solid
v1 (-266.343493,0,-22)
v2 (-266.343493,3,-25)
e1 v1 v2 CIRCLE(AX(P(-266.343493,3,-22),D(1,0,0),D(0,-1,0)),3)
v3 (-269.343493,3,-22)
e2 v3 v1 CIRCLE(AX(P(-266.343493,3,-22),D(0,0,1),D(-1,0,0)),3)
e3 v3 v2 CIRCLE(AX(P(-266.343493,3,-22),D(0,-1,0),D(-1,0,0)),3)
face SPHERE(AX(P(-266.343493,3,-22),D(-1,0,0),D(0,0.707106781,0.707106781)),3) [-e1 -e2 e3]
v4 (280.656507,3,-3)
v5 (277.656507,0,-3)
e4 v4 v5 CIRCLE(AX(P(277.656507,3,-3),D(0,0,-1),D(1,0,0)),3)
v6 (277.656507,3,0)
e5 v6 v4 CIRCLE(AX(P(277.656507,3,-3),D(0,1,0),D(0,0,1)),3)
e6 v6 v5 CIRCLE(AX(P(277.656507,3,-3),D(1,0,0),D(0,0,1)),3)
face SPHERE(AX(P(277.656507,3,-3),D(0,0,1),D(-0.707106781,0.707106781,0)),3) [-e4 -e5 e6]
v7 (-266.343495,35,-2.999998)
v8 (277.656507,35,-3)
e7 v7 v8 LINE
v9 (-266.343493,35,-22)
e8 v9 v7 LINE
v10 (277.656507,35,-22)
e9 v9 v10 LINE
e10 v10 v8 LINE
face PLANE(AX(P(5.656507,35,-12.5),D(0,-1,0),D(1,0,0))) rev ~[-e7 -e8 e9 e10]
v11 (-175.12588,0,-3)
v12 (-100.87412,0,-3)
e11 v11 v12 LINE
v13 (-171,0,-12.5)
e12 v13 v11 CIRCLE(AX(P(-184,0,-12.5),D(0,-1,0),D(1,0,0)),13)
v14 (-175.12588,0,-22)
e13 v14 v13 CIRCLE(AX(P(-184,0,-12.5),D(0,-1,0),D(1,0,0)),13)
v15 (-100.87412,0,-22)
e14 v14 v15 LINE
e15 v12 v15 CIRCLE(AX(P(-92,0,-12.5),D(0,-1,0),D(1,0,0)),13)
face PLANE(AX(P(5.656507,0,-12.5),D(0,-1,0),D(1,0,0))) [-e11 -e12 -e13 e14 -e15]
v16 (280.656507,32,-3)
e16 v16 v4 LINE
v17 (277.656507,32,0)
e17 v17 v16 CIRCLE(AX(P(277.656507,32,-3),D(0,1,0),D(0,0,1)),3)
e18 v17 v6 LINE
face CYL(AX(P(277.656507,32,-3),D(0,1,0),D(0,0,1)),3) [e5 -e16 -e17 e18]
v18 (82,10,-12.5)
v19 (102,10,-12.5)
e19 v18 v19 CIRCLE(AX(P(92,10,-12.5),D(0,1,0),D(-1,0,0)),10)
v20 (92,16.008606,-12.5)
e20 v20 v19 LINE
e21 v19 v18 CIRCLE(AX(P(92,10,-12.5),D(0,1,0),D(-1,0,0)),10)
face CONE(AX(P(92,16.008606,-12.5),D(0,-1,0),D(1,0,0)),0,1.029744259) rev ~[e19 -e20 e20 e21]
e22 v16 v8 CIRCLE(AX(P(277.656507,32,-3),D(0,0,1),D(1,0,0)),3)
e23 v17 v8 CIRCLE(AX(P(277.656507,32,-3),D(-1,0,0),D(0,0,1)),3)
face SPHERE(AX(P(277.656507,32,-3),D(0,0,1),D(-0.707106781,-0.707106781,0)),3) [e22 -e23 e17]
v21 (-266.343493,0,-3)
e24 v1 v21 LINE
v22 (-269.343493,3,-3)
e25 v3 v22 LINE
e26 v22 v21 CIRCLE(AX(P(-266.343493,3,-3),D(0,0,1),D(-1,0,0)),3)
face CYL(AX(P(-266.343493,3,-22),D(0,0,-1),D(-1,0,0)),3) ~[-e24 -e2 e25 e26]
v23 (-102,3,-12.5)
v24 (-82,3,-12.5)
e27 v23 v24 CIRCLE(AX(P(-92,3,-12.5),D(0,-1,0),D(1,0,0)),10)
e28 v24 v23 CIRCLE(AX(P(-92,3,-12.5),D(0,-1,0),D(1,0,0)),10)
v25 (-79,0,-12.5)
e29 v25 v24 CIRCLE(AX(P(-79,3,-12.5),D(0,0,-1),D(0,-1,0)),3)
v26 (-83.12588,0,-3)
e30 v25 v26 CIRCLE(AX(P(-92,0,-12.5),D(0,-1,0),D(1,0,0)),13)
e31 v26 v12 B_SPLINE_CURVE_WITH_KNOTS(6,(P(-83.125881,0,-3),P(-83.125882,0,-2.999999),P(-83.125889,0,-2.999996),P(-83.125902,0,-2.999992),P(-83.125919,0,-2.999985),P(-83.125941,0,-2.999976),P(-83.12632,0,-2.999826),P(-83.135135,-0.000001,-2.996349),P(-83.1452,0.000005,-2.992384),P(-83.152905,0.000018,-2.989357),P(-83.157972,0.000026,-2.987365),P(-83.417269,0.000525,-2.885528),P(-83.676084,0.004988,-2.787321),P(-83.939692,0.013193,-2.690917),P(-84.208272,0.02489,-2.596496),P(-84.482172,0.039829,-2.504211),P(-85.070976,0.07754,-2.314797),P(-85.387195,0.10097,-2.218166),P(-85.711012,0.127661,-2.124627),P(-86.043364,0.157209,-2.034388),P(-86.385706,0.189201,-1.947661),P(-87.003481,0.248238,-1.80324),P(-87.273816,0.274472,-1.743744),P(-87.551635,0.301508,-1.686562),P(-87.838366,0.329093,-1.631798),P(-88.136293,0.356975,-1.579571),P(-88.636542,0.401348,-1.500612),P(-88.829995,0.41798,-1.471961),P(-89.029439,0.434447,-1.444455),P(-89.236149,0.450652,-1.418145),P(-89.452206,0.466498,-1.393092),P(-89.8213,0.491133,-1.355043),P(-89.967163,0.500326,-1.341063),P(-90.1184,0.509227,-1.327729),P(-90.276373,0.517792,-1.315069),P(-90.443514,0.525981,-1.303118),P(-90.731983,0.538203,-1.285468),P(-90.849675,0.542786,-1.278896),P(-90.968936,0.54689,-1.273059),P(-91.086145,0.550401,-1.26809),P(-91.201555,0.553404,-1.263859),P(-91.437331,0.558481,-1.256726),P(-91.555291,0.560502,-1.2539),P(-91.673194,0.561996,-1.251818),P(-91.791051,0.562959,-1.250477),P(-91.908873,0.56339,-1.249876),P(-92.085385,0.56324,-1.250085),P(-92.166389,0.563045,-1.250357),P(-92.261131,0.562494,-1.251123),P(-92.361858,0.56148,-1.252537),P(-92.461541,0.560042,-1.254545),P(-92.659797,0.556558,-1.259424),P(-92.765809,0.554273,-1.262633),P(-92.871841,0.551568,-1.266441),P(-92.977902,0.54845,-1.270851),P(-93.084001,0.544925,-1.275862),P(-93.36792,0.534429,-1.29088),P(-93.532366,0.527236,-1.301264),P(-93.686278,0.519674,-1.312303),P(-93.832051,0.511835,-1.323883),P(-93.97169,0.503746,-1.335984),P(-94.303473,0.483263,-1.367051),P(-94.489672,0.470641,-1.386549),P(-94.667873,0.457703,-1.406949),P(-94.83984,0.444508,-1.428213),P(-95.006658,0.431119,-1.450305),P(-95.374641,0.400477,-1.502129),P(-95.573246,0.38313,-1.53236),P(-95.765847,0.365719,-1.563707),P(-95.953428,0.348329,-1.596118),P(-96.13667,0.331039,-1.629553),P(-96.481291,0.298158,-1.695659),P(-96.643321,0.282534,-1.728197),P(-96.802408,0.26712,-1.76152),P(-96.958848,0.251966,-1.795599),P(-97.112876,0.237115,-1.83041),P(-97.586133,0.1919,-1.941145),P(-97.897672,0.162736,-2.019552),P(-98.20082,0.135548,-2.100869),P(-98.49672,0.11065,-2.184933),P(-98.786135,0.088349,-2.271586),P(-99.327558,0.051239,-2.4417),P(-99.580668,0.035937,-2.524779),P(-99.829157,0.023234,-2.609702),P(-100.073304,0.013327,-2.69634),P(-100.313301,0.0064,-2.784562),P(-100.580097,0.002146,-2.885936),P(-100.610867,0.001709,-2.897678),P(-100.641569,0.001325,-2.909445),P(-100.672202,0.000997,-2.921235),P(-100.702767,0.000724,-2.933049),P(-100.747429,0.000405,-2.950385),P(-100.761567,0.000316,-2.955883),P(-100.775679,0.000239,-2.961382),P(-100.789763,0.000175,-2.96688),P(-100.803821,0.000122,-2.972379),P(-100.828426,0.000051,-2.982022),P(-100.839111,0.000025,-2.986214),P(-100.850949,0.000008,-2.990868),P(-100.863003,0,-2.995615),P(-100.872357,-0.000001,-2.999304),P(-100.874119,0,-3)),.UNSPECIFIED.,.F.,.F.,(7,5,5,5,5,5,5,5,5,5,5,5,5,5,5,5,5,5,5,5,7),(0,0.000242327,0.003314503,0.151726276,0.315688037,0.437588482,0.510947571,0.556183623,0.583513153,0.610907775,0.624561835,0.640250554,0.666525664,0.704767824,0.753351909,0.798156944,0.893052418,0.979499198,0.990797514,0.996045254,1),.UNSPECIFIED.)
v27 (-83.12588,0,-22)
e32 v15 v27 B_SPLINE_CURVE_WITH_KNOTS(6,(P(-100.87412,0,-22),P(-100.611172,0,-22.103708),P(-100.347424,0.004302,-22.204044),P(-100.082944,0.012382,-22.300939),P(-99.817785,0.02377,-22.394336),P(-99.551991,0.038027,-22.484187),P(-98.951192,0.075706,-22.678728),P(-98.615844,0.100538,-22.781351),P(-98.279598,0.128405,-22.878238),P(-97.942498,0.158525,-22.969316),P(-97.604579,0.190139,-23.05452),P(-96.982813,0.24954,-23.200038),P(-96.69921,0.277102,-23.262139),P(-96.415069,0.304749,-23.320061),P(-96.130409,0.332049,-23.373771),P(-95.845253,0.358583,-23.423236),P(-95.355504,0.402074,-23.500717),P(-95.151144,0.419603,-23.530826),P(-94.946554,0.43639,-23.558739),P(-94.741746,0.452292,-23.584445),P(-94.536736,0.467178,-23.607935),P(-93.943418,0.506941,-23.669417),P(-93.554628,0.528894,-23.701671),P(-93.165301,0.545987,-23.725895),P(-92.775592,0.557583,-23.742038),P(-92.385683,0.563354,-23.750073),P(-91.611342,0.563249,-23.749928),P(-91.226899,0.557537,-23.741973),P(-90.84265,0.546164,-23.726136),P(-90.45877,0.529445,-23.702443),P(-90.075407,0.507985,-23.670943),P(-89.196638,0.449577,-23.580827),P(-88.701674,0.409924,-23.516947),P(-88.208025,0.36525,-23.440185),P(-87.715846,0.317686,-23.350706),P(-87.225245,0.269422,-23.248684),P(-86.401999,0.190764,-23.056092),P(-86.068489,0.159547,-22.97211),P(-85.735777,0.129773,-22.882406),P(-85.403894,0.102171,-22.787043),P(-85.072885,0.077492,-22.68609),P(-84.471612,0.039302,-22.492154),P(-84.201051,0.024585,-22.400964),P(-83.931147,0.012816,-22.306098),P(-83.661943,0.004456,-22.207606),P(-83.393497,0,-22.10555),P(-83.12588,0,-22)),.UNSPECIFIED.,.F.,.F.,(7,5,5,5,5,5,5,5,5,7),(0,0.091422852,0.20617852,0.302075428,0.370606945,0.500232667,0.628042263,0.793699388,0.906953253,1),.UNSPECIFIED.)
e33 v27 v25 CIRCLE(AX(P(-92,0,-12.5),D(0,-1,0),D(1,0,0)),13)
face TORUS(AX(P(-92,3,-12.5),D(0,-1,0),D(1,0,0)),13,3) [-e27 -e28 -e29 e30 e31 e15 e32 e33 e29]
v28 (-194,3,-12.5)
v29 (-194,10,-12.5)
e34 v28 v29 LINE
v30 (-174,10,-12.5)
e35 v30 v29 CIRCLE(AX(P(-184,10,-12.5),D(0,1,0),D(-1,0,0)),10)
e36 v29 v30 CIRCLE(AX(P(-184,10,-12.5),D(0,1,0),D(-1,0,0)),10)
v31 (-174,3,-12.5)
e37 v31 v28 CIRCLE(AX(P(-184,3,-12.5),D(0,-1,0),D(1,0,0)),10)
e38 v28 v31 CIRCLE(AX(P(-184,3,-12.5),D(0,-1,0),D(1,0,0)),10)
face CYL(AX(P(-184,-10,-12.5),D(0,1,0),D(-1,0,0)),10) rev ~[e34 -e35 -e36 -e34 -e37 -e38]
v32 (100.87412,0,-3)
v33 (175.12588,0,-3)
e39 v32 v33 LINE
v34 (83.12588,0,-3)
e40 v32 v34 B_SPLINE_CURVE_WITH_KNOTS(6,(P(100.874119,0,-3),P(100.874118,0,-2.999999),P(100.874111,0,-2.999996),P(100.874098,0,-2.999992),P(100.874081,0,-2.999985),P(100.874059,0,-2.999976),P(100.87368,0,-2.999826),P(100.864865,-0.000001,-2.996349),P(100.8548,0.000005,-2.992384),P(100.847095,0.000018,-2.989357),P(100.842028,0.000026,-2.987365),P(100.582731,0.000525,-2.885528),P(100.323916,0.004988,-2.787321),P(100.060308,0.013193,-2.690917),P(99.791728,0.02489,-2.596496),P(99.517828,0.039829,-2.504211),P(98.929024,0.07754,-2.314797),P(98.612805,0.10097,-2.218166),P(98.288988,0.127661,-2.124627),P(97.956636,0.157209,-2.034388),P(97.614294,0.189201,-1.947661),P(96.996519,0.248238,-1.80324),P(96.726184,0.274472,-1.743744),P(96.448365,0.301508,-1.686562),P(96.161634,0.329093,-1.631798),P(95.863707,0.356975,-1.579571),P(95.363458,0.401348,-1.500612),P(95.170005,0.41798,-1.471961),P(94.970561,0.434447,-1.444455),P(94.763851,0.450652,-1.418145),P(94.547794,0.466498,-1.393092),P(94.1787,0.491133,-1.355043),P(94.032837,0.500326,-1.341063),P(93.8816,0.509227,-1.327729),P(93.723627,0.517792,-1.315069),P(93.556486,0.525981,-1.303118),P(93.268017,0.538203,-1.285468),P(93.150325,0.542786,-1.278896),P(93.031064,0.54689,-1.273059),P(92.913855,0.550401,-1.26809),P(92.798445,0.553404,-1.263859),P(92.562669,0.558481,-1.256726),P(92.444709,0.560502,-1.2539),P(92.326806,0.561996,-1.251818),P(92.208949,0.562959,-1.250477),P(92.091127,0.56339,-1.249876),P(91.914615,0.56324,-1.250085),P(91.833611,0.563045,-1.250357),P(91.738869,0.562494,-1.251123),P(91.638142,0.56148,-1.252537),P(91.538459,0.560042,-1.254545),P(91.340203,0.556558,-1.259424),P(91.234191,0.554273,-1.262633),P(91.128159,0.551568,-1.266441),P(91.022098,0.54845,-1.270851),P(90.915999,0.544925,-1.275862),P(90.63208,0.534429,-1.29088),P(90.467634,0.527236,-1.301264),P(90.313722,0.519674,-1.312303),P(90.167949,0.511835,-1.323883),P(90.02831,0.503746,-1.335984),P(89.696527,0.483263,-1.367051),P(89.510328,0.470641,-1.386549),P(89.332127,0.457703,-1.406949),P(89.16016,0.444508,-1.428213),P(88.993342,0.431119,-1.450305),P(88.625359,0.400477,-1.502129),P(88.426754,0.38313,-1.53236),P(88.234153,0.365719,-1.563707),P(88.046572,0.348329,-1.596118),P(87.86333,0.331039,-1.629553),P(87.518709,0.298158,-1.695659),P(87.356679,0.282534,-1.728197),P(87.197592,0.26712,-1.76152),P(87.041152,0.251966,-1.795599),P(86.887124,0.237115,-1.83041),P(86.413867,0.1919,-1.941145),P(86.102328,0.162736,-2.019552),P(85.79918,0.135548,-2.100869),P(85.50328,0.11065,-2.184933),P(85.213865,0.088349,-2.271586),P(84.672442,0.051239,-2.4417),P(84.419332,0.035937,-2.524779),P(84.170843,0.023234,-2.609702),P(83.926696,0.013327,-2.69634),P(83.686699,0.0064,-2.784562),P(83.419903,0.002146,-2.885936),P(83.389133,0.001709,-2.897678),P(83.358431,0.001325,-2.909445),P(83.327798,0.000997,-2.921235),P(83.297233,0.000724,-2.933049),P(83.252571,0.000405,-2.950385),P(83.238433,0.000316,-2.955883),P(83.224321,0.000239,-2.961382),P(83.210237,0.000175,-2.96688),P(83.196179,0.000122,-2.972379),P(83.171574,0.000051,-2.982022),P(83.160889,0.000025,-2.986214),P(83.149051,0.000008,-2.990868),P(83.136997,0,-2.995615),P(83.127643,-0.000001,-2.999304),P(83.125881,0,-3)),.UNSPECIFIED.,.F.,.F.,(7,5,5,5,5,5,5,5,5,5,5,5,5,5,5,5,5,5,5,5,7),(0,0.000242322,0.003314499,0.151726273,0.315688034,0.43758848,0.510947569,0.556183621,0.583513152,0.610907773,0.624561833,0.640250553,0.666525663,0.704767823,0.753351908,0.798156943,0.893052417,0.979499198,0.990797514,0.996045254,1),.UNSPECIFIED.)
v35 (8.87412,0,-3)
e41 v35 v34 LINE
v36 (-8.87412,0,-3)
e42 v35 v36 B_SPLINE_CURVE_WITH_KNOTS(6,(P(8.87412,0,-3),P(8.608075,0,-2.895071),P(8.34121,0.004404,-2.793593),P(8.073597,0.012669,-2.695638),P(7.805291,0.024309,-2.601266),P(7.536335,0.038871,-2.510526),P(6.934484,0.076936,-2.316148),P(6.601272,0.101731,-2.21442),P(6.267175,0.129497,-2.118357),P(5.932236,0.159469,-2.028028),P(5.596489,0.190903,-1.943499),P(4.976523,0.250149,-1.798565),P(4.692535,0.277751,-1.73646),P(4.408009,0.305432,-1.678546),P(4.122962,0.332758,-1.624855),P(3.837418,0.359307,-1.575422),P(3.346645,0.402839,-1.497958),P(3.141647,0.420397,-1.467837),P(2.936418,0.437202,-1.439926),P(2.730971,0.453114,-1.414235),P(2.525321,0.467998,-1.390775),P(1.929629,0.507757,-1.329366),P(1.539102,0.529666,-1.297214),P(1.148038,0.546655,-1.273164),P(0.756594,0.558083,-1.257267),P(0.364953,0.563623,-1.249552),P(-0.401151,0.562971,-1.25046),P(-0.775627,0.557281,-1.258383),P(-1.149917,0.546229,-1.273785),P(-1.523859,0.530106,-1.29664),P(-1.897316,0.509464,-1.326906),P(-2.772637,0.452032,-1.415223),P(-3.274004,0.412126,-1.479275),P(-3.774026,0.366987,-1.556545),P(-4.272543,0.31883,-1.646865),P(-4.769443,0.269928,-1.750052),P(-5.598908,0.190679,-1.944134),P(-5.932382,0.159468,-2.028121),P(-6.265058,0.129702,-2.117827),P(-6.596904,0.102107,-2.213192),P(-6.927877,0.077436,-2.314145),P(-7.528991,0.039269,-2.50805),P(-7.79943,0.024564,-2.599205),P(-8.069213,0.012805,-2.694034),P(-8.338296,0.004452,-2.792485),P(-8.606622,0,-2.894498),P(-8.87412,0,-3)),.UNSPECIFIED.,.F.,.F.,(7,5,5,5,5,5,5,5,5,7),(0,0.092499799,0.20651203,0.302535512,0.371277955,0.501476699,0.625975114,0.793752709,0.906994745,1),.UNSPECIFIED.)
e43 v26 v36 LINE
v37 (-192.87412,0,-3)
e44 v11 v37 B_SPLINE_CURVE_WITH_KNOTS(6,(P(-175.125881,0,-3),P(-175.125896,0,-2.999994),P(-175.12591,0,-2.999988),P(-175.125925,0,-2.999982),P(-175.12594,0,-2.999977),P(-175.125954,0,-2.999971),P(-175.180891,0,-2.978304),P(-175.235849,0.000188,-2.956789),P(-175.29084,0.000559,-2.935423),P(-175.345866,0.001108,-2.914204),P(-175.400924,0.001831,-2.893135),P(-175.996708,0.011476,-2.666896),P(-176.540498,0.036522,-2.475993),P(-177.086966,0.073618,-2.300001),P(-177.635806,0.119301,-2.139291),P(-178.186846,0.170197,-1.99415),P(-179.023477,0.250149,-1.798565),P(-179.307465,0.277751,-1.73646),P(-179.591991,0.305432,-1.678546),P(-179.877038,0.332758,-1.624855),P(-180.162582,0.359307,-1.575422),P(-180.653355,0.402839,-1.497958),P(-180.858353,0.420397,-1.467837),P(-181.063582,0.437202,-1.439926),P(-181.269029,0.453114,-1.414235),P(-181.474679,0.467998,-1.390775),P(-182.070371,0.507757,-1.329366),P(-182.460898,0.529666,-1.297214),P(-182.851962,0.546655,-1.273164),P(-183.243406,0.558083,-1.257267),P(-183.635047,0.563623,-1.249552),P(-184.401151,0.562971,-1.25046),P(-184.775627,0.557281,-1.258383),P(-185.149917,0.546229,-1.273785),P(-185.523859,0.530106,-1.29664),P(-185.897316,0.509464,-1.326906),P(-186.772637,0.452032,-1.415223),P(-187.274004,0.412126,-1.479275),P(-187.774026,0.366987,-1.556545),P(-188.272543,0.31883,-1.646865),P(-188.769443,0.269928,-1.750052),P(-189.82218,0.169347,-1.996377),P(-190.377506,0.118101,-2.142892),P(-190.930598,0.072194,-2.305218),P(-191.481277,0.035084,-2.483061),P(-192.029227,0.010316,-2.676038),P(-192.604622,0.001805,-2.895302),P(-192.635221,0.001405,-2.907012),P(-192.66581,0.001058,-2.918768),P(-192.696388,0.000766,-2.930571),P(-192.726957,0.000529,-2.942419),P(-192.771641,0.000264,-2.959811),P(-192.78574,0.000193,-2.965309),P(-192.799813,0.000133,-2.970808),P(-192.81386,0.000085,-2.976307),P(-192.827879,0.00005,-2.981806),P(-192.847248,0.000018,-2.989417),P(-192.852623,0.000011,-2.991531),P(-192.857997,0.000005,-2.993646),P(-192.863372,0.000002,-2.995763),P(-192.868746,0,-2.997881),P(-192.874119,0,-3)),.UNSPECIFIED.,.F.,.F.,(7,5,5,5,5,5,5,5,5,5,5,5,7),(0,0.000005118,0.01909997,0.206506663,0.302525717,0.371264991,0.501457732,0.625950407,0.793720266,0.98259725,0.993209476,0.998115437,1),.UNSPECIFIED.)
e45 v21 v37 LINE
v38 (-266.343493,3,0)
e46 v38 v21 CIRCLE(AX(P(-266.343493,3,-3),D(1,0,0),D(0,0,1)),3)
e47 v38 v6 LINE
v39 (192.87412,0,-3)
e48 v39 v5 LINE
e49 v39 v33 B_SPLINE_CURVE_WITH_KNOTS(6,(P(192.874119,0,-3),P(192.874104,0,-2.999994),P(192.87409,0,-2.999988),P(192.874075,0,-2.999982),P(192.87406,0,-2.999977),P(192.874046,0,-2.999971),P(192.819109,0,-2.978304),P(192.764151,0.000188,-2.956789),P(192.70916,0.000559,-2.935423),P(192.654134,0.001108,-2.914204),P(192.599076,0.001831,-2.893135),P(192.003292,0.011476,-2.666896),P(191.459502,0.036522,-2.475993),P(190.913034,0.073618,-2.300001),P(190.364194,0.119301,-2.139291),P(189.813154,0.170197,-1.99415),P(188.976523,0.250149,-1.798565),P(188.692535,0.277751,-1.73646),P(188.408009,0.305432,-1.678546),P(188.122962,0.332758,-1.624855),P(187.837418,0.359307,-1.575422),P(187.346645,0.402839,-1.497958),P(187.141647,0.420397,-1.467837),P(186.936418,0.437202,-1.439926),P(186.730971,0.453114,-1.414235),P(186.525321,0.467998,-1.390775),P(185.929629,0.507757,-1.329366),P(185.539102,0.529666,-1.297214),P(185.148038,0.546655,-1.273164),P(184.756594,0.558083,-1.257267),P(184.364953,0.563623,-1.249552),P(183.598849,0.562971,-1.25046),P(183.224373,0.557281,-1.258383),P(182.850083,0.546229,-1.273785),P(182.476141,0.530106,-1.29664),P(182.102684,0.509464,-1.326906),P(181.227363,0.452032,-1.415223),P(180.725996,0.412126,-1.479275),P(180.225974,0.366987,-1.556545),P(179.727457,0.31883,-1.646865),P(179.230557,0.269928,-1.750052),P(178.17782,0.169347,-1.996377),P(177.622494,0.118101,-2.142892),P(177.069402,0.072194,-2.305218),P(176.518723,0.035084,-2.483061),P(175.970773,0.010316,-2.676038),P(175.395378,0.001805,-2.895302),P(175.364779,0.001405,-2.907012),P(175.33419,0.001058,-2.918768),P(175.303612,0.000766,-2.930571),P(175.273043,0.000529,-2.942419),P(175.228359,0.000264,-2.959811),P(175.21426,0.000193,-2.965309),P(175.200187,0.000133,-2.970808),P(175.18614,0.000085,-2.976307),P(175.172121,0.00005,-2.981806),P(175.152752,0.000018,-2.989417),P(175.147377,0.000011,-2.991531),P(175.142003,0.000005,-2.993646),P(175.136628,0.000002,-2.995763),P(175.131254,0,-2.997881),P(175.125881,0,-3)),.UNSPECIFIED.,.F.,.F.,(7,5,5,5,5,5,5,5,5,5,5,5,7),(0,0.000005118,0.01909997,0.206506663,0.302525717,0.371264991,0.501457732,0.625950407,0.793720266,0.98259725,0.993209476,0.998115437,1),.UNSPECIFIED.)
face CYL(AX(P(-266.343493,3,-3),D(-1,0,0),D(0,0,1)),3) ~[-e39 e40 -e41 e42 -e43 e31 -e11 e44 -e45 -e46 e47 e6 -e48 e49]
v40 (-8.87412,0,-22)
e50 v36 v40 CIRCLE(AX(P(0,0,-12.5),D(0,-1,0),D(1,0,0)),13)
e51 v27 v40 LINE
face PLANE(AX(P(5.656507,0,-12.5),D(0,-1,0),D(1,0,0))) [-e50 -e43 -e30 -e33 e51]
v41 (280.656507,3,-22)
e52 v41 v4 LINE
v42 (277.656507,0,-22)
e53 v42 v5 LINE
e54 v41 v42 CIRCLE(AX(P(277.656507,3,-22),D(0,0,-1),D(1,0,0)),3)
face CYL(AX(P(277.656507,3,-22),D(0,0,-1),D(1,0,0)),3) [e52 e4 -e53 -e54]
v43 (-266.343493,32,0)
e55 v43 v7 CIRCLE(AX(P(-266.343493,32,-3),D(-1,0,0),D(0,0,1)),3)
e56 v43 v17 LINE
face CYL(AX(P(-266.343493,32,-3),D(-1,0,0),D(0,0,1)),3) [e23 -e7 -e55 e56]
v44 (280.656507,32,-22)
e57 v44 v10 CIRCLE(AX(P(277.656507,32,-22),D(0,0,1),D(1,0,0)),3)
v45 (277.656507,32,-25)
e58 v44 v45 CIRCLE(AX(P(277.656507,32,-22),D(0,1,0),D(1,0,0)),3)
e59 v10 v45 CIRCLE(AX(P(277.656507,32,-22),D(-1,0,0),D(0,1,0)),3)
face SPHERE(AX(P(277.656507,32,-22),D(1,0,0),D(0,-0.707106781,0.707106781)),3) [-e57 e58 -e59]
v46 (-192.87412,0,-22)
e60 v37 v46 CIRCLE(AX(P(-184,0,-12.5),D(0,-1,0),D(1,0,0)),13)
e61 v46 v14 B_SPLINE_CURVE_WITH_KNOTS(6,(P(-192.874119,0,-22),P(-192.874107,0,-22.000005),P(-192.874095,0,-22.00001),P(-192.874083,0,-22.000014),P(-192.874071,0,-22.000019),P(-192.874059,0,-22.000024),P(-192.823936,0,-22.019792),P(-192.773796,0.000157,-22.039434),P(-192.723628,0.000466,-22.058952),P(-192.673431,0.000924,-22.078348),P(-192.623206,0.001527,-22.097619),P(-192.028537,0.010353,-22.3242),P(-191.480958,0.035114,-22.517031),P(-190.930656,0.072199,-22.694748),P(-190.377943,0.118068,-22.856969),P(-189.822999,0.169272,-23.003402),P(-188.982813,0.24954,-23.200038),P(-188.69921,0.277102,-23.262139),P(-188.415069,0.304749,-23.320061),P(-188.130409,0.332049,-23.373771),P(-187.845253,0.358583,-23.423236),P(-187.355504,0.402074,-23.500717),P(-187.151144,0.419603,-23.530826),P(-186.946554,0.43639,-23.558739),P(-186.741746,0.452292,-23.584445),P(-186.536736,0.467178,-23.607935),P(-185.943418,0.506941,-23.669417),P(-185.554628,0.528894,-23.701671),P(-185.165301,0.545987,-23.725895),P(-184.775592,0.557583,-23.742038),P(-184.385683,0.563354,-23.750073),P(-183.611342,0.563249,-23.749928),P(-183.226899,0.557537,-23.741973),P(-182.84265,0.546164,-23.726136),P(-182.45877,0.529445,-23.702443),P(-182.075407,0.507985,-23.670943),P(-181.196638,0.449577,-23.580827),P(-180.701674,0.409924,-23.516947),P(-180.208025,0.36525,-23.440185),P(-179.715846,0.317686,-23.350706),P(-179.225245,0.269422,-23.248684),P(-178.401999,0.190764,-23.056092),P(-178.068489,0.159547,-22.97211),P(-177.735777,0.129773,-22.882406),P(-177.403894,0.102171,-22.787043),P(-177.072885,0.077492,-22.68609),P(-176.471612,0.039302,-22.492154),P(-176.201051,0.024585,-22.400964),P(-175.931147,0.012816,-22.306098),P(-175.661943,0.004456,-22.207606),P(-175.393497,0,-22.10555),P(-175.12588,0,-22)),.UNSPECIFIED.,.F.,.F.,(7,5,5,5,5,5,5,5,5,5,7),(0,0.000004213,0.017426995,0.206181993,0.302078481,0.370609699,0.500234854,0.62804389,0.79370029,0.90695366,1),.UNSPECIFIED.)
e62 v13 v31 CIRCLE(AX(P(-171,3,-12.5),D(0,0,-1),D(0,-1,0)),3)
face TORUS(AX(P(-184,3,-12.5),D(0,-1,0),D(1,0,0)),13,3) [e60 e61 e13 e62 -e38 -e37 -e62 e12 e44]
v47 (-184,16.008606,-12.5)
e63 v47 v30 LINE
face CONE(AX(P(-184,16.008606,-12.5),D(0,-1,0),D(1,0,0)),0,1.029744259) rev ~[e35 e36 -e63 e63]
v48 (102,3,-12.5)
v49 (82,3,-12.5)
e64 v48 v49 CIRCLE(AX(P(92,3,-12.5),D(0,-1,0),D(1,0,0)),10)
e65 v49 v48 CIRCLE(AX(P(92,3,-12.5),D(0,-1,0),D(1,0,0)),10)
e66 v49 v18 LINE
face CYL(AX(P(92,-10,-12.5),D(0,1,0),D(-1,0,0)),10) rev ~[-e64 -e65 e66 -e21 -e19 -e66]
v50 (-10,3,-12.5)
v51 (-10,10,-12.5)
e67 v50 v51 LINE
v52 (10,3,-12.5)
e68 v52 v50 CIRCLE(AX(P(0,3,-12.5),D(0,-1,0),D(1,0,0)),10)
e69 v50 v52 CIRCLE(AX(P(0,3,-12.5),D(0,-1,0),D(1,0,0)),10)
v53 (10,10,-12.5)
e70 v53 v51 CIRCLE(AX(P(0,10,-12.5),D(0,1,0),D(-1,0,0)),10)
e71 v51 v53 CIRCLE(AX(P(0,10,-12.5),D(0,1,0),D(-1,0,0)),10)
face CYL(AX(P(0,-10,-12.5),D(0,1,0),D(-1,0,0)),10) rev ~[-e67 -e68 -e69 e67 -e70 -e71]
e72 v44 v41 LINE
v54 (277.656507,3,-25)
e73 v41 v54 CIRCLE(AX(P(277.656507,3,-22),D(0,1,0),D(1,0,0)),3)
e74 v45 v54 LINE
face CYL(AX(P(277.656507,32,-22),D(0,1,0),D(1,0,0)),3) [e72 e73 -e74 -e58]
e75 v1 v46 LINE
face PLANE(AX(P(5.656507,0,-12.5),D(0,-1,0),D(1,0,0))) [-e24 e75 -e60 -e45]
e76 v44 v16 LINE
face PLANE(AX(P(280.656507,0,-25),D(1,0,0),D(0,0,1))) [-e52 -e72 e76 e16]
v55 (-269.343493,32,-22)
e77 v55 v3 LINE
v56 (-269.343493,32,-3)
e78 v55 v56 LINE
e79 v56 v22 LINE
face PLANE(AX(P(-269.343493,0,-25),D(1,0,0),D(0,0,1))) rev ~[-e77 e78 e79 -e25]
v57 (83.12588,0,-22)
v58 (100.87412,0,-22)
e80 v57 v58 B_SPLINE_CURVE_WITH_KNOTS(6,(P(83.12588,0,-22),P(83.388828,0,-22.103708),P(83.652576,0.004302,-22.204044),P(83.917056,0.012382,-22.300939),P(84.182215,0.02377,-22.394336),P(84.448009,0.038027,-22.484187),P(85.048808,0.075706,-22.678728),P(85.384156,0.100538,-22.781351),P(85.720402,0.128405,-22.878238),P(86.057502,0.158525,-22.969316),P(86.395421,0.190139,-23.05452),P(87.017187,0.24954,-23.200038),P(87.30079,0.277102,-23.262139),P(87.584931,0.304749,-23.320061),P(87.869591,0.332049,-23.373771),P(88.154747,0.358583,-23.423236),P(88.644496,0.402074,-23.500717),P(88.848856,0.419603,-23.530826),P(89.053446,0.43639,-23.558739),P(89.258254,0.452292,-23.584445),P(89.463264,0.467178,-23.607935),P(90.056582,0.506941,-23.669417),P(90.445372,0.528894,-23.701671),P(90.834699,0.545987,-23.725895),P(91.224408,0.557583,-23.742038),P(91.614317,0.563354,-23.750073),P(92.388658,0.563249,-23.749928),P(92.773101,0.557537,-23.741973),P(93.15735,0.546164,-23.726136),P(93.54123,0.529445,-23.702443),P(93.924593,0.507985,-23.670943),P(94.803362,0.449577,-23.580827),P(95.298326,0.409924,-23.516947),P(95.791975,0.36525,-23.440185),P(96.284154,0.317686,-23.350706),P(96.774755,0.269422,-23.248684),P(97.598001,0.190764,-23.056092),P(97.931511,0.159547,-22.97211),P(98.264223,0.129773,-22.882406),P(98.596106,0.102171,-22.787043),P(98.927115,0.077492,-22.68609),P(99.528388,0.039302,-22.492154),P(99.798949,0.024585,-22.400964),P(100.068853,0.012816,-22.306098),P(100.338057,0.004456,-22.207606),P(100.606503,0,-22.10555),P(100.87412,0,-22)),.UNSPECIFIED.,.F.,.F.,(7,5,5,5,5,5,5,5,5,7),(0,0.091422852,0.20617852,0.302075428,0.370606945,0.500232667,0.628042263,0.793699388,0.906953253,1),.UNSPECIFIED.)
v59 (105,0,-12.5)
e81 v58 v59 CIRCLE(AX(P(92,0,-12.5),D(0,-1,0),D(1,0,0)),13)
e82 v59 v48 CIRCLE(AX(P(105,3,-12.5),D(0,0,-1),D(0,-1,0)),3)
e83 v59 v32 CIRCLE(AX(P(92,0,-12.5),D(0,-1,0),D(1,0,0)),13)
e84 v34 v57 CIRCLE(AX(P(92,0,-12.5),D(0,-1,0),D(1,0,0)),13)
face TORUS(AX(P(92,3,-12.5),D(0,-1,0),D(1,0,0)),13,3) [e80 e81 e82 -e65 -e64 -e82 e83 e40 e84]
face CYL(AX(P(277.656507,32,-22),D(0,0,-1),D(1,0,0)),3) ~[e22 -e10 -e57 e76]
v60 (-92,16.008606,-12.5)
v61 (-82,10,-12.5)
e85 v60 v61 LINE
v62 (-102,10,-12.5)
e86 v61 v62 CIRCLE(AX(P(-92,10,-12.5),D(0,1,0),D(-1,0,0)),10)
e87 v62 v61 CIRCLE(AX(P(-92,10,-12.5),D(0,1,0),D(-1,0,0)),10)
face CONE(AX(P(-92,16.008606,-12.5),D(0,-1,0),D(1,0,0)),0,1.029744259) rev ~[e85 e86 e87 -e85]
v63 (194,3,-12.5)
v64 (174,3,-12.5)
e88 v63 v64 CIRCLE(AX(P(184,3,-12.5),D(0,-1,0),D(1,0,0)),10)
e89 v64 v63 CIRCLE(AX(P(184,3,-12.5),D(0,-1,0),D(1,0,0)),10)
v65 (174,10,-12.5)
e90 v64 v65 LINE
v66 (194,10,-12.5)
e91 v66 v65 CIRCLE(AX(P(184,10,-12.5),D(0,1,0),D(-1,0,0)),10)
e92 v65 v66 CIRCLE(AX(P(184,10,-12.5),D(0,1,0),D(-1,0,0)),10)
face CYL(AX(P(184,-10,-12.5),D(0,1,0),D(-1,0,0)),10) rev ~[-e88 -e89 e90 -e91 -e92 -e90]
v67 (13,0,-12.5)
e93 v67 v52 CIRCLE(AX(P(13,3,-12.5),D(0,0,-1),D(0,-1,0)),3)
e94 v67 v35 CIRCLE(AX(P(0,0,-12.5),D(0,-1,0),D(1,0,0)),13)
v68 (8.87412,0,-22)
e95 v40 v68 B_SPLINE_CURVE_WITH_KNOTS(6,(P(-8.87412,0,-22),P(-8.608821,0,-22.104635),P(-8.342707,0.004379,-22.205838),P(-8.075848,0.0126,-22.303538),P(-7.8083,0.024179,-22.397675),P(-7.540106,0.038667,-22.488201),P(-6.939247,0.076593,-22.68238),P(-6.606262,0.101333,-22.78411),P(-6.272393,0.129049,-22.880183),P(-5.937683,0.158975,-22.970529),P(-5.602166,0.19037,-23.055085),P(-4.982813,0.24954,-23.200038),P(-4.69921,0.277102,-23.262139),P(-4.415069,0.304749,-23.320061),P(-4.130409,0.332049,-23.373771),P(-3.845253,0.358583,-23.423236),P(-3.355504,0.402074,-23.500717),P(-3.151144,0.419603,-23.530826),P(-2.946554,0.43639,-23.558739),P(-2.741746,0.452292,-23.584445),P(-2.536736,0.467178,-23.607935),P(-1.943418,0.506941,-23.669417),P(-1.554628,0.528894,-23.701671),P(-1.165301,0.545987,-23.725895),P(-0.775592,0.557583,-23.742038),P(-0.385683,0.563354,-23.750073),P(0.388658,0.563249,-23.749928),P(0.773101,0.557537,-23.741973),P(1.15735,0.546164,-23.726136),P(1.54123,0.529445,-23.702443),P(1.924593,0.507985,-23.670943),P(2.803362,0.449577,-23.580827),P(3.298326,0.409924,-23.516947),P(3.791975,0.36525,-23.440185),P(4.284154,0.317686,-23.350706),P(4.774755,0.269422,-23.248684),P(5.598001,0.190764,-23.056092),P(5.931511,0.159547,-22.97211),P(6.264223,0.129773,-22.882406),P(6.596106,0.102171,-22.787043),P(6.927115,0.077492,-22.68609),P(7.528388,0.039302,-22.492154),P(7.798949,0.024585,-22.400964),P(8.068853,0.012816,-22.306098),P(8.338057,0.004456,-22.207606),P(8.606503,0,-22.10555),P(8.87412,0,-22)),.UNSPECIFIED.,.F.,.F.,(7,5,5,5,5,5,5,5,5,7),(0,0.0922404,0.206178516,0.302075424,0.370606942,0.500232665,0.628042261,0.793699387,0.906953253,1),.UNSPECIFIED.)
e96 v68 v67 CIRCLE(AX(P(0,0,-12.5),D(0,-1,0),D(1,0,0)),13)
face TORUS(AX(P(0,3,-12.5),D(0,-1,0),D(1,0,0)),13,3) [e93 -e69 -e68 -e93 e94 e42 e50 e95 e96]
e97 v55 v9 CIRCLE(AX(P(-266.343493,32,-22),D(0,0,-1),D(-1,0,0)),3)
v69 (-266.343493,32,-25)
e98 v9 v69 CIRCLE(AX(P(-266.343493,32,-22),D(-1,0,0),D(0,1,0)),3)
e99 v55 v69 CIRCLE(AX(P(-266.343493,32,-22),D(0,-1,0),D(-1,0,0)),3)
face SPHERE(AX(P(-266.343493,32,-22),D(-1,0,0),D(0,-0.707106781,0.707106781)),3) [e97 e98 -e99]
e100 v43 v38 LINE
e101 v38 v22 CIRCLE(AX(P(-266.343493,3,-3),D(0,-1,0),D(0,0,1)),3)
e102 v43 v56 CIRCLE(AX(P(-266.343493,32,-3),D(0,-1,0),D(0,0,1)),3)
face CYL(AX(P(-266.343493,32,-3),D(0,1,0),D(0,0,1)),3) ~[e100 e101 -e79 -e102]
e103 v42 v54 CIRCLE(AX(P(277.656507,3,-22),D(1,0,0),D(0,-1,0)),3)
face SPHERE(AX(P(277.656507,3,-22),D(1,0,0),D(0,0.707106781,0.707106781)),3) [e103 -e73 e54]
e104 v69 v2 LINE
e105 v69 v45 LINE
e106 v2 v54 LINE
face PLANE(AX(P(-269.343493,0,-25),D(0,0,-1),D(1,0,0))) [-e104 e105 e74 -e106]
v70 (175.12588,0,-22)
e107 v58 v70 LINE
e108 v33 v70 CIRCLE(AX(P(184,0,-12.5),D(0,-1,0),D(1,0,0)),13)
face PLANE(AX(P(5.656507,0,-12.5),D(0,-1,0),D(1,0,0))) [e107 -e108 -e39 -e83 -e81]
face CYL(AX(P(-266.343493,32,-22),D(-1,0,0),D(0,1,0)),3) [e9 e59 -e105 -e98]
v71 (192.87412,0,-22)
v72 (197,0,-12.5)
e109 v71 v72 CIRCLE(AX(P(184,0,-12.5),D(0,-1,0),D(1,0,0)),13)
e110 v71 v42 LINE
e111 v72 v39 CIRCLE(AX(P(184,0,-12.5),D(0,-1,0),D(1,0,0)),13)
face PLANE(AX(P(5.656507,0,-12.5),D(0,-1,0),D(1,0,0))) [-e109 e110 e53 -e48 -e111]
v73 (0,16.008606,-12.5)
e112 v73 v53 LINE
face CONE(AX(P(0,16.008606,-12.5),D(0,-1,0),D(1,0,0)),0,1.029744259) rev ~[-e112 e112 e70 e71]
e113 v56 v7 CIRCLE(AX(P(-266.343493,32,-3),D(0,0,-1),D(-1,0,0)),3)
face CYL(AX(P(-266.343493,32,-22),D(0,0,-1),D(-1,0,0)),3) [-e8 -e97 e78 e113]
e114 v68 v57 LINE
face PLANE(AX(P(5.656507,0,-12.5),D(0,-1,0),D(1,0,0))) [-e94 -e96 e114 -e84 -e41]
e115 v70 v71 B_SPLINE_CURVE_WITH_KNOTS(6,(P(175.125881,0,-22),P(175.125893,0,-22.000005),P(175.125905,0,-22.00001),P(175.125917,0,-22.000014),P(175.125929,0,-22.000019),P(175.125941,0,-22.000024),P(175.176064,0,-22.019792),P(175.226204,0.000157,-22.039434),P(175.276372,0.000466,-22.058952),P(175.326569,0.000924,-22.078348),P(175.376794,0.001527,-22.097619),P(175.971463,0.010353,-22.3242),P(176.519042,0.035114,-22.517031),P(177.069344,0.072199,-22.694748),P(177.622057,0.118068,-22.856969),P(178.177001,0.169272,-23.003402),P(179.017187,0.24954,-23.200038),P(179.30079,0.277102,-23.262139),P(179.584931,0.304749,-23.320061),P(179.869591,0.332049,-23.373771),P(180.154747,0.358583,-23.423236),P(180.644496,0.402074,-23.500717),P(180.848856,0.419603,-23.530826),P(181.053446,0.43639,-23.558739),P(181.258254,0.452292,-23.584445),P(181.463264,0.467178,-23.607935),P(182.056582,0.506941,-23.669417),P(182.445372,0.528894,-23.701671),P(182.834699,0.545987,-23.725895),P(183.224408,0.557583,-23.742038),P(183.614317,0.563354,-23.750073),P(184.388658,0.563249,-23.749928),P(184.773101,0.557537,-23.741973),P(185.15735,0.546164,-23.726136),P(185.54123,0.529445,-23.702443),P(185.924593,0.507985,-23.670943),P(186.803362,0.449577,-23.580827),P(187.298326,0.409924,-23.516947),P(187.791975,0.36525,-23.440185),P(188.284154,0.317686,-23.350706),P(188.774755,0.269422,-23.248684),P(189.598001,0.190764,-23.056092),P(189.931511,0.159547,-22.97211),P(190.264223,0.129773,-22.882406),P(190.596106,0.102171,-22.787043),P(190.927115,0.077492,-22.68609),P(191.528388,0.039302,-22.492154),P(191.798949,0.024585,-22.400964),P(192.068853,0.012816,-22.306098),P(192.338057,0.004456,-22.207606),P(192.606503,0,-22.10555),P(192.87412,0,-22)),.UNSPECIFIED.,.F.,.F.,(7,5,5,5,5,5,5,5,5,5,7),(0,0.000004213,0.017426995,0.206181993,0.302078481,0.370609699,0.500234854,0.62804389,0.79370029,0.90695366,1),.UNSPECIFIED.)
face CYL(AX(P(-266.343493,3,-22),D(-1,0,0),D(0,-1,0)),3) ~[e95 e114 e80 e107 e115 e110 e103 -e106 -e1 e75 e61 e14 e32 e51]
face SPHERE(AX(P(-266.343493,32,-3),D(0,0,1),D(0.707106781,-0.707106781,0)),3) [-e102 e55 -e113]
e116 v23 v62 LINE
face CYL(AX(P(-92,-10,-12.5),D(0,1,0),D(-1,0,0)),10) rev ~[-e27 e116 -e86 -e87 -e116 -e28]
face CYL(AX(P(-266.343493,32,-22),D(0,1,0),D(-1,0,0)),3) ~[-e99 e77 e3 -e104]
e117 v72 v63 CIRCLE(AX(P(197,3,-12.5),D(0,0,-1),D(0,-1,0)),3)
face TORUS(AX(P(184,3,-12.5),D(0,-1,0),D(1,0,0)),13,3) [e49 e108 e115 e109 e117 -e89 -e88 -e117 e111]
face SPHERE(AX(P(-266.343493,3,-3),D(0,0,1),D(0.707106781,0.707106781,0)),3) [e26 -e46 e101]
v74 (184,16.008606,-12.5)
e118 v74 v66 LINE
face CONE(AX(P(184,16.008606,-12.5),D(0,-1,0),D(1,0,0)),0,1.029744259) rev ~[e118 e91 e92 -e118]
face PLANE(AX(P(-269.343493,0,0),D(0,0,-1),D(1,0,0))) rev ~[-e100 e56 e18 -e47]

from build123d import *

# Parameters (mm, degrees)
F0_W         = 550
F0_H         = 25
F1_DEPTH     = 35
F3_D         = 20
F3_DEPTH     = 10
F3_TIP       = 6.0086061903
F4_T1_DEPTH  = 544
F4_T3_DEPTH  = 19
F4_T5_DEPTH  = 29
F4_S9_W      = 3
F4_S9_H      = 3
F4_T10_DEPTH = 3
F4_S15_W     = 3
F4_S15_H     = 3
F4_T16_DEPTH = 3
F4_S21_W     = 3
F4_S21_H     = 3
F4_T22_DEPTH = 3
F4_S27_W     = 3
F4_S27_H     = 3
F4_T28_DEPTH = 3
F4_S33_W     = 3
F4_S33_H     = 3
F4_T34_DEPTH = 3
F4_S39_W     = 3
F4_S39_H     = 3
F4_T40_DEPTH = 3
F4_S45_W     = 3
F4_S45_H     = 3
F4_T46_DEPTH = 3
F4_S51_W     = 3
F4_S51_H     = 3
F4_T52_DEPTH = 3


# Not quite as in the source:
# - a fillet or chamfer that OpenCascade refuses, or shapes differently, is made with other operations: its cross-section is extruded or revolved along the edge and cut away or added
# - a feature names something its author has since deleted; it is built from what else it names


with BuildPart() as f1:
    # F0 (on Front) → F1 (new body)
    with BuildSketch(Plane.XZ):
        with Locations((5.6565068662, -12.5)):
            Rectangle(F0_W, F0_H)
    extrude(amount=-F1_DEPTH)

    # F3
    with Locations(Plane.XZ):
        with Locations((0, -12.5), (-92, -12.5), (-184, -12.5), (92, -12.5), (184, -12.5)):
            Hole(F3_D / 2, depth=F3_DEPTH)
            with Locations((0, 0, -(F3_DEPTH + F3_TIP / 2))):  # 118° drill point
                Cone(0, F3_D / 2, F3_TIP, mode=Mode.SUBTRACT)

    # F4: fillet of radius 3 on 17 edges, made by hand

    # F4_s2 → F4_t1 (cut)
    with BuildSketch(Plane.YZ.offset(-266.3434931338)):
        with BuildLine():
            ThreePointArc((32, 0), (34.1213203436, -0.8786796564), (35, -3))
            Line((35, -3), (35, 0))
            Line((35, 0), (32, 0))
        make_face()
        with BuildLine():
            ThreePointArc((35, -22), (34.1213203436, -24.1213203436), (32, -25))
            Line((32, -25), (35, -25))
            Line((35, -25), (35, -22))
        make_face()
        with BuildLine():
            ThreePointArc((3, 0), (0.8786796564, -0.8786796564), (0, -3))
            Line((0, -3), (0, 0))
            Line((0, 0), (3, 0))
        make_face()
        with BuildLine():
            ThreePointArc((0, -22), (0.8786796564, -24.1213203436), (3, -25))
            Line((3, -25), (0, -25))
            Line((0, -25), (0, -22))
        make_face()
    extrude(amount=F4_T1_DEPTH, mode=Mode.SUBTRACT)

    # F4_s4 → F4_t3 (cut)
    with BuildSketch(Plane.XY.offset(-22)):
        with BuildLine():
            ThreePointArc((-269.3434931338, 32), (-268.4648134773, 34.1213203436), (-266.3434931338, 35))
            Line((-266.3434931338, 35), (-269.3434931338, 35))
            Line((-269.3434931338, 35), (-269.3434931338, 32))
        make_face()
        with BuildLine():
            ThreePointArc((280.6565068662, 32), (279.7778272098, 34.1213203436), (277.6565068662, 35))
            Line((277.6565068662, 35), (280.6565068662, 35))
            Line((280.6565068662, 35), (280.6565068662, 32))
        make_face()
        with BuildLine():
            ThreePointArc((280.6565068662, 3), (279.7778272098, 0.8786796564), (277.6565068662, 0))
            Line((277.6565068662, 0), (280.6565068662, 0))
            Line((280.6565068662, 0), (280.6565068662, 3))
        make_face()
        with BuildLine():
            ThreePointArc((-269.3434931338, 3), (-268.4648134773, 0.8786796564), (-266.3434931338, 0))
            Line((-266.3434931338, 0), (-269.3434931338, 0))
            Line((-269.3434931338, 0), (-269.3434931338, 3))
        make_face()
    extrude(amount=F4_T3_DEPTH, mode=Mode.SUBTRACT)

    # F4_s6 → F4_t5 (cut)
    with BuildSketch(Plane.XZ.offset(-32)):
        with BuildLine():
            ThreePointArc((280.6565068662, -22), (279.7778272098, -24.1213203436), (277.6565068662, -25))
            Line((277.6565068662, -25), (280.6565068662, -25))
            Line((280.6565068662, -25), (280.6565068662, -22))
        make_face()
        with BuildLine():
            ThreePointArc((277.6565068662, 0), (279.7778272098, -0.8786796564), (280.6565068662, -3))
            Line((280.6565068662, -3), (280.6565068662, 0))
            Line((280.6565068662, 0), (277.6565068662, 0))
        make_face()
        with BuildLine():
            ThreePointArc((-266.3434931338, 0), (-268.4648134773, -0.8786796564), (-269.3434931338, -3))
            Line((-269.3434931338, -3), (-269.3434931338, 0))
            Line((-269.3434931338, 0), (-266.3434931338, 0))
        make_face()
        with BuildLine():
            ThreePointArc((-269.3434931338, -22), (-268.4648134773, -24.1213203436), (-266.3434931338, -25))
            Line((-266.3434931338, -25), (-269.3434931338, -25))
            Line((-269.3434931338, -25), (-269.3434931338, -22))
        make_face()
    extrude(amount=F4_T5_DEPTH, mode=Mode.SUBTRACT)


with BuildPart() as f4_tool8:
    # F4_s9 → F4_t10 (new body)
    with BuildSketch(Plane.XY.offset(-3)):
        with Locations((279.1565068662, 33.5)):
            Rectangle(F4_S9_W, F4_S9_H)
    extrude(amount=F4_T10_DEPTH)

    # F4_s11 → F4_t12 (revolve, cut)
    with BuildSketch(Plane(origin=(277.6565068662, 32, -3), x_dir=(-0.7071067812, -0.7071067812, 0), z_dir=(-0.7071067812, 0.7071067812, 0))):
        with BuildLine():
            ThreePointArc((0, -3), (3, 0), (0, 3))
            Line((0, 3), (0, -3))
        make_face()
    revolve(axis=Axis((277.6565068662, 32, -3), (0, 0, 1)), mode=Mode.SUBTRACT)


with BuildPart() as f1_1:
    add(f1.part)

    # F4_t7: cut F4_tool8
    add(f4_tool8.part, mode=Mode.SUBTRACT)


with BuildPart() as f4_tool14:
    # F4_s15 → F4_t16 (new body)
    with BuildSketch(Plane.XY.offset(-3)):
        with Locations((-267.8434931338, 33.5)):
            Rectangle(F4_S15_W, F4_S15_H)
    extrude(amount=F4_T16_DEPTH)

    # F4_s17 → F4_t18 (revolve, cut)
    with BuildSketch(Plane(origin=(-266.3434931338, 32, -3), x_dir=(0.7071067812, -0.7071067812, 0), z_dir=(-0.7071067812, -0.7071067812, 0))):
        with BuildLine():
            ThreePointArc((0, -3), (3, 0), (0, 3))
            Line((0, 3), (0, -3))
        make_face()
    revolve(axis=Axis((-266.3434931338, 32, -3), (0, 0, 1)), mode=Mode.SUBTRACT)


with BuildPart() as f1_2:
    add(f1_1.part)

    # F4_t13: cut F4_tool14
    add(f4_tool14.part, mode=Mode.SUBTRACT)


with BuildPart() as f4_tool20:
    # F4_s21 → F4_t22 (new body)
    with BuildSketch(Plane.YZ.offset(-266.3434931338)):
        with Locations((33.5, -23.5)):
            Rectangle(F4_S21_W, F4_S21_H)
    extrude(amount=-F4_T22_DEPTH)

    # F4_s23 → F4_t24 (revolve, cut)
    with BuildSketch(Plane(origin=(-266.3434931338, 32, -22), x_dir=(0, -0.7071067812, 0.7071067812), z_dir=(0, -0.7071067812, -0.7071067812))):
        with BuildLine():
            ThreePointArc((0, -3), (3, 0), (0, 3))
            Line((0, 3), (0, -3))
        make_face()
    revolve(axis=Axis((-266.3434931338, 32, -22), (-1, 0, 0)), mode=Mode.SUBTRACT)


with BuildPart() as f1_3:
    add(f1_2.part)

    # F4_t19: cut F4_tool20
    add(f4_tool20.part, mode=Mode.SUBTRACT)


with BuildPart() as f4_tool26:
    # F4_s27 → F4_t28 (new body)
    with BuildSketch(Plane.YZ.offset(277.6565068662)):
        with Locations((33.5, -23.5)):
            Rectangle(F4_S27_W, F4_S27_H)
    extrude(amount=F4_T28_DEPTH)

    # F4_s29 → F4_t30 (revolve, cut)
    with BuildSketch(Plane(origin=(277.6565068662, 32, -22), x_dir=(0, -0.7071067812, 0.7071067812), z_dir=(0, 0.7071067812, 0.7071067812))):
        with BuildLine():
            ThreePointArc((0, -3), (3, 0), (0, 3))
            Line((0, 3), (0, -3))
        make_face()
    revolve(axis=Axis((277.6565068662, 32, -22), (1, 0, 0)), mode=Mode.SUBTRACT)


with BuildPart() as f1_4:
    add(f1_3.part)

    # F4_t25: cut F4_tool26
    add(f4_tool26.part, mode=Mode.SUBTRACT)


with BuildPart() as f4_tool32:
    # F4_s33 → F4_t34 (new body)
    with BuildSketch(Plane.YZ.offset(277.6565068662)):
        with Locations((1.5, -23.5)):
            Rectangle(F4_S33_W, F4_S33_H)
    extrude(amount=F4_T34_DEPTH)

    # F4_s35 → F4_t36 (revolve, cut)
    with BuildSketch(Plane(origin=(277.6565068662, 3, -22), x_dir=(0, 0.7071067812, 0.7071067812), z_dir=(0, 0.7071067812, -0.7071067812))):
        with BuildLine():
            ThreePointArc((0, -3), (3, 0), (0, 3))
            Line((0, 3), (0, -3))
        make_face()
    revolve(axis=Axis((277.6565068662, 3, -22), (1, 0, 0)), mode=Mode.SUBTRACT)


with BuildPart() as f1_5:
    add(f1_4.part)

    # F4_t31: cut F4_tool32
    add(f4_tool32.part, mode=Mode.SUBTRACT)


with BuildPart() as f4_tool38:
    # F4_s39 → F4_t40 (new body)
    with BuildSketch(Plane.XY.offset(-3)):
        with Locations((279.1565068662, 1.5)):
            Rectangle(F4_S39_W, F4_S39_H)
    extrude(amount=F4_T40_DEPTH)

    # F4_s41 → F4_t42 (revolve, cut)
    with BuildSketch(Plane(origin=(277.6565068662, 3, -3), x_dir=(-0.7071067812, 0.7071067812, 0), z_dir=(0.7071067812, 0.7071067812, 0))):
        with BuildLine():
            ThreePointArc((0, -3), (3, 0), (0, 3))
            Line((0, 3), (0, -3))
        make_face()
    revolve(axis=Axis((277.6565068662, 3, -3), (0, 0, 1)), mode=Mode.SUBTRACT)


with BuildPart() as f1_6:
    add(f1_5.part)

    # F4_t37: cut F4_tool38
    add(f4_tool38.part, mode=Mode.SUBTRACT)


with BuildPart() as f4_tool44:
    # F4_s45 → F4_t46 (new body)
    with BuildSketch(Plane.XY.offset(-3)):
        with Locations((-267.8434931338, 1.5)):
            Rectangle(F4_S45_W, F4_S45_H)
    extrude(amount=F4_T46_DEPTH)

    # F4_s47 → F4_t48 (revolve, cut)
    with BuildSketch(Plane(origin=(-266.3434931338, 3, -3), x_dir=(0.7071067812, 0.7071067812, 0), z_dir=(0.7071067812, -0.7071067812, 0))):
        with BuildLine():
            ThreePointArc((0, -3), (3, 0), (0, 3))
            Line((0, 3), (0, -3))
        make_face()
    revolve(axis=Axis((-266.3434931338, 3, -3), (0, 0, 1)), mode=Mode.SUBTRACT)


with BuildPart() as f1_7:
    add(f1_6.part)

    # F4_t43: cut F4_tool44
    add(f4_tool44.part, mode=Mode.SUBTRACT)


with BuildPart() as f4_tool50:
    # F4_s51 → F4_t52 (new body)
    with BuildSketch(Plane.YZ.offset(-266.3434931338)):
        with Locations((1.5, -23.5)):
            Rectangle(F4_S51_W, F4_S51_H)
    extrude(amount=-F4_T52_DEPTH)

    # F4_s53 → F4_t54 (revolve, cut)
    with BuildSketch(Plane(origin=(-266.3434931338, 3, -22), x_dir=(0, 0.7071067812, 0.7071067812), z_dir=(0, -0.7071067812, 0.7071067812))):
        with BuildLine():
            ThreePointArc((0, -3), (3, 0), (0, 3))
            Line((0, 3), (0, -3))
        make_face()
    revolve(axis=Axis((-266.3434931338, 3, -22), (-1, 0, 0)), mode=Mode.SUBTRACT)


with BuildPart() as f1_8:
    add(f1_7.part)

    # F4_t49: cut F4_tool50
    add(f4_tool50.part, mode=Mode.SUBTRACT)

    # F4_s55 → F4_t56 (revolve, cut)
    with BuildSketch(Plane.XY.offset(-12.5)):
        with BuildLine():
            ThreePointArc((-171, 0), (-173.1213203436, 0.8786796564), (-174, 3))
            Line((-174, 3), (-174, 0))
            Line((-174, 0), (-171, 0))
        make_face()
    revolve(axis=Axis((-184, 0, -12.5), (0, -1, 0)), mode=Mode.SUBTRACT)

    # F4_s57 → F4_t58 (revolve, cut)
    with BuildSketch(Plane.XY.offset(-12.5)):
        with BuildLine():
            ThreePointArc((-79, 0), (-81.1213203436, 0.8786796564), (-82, 3))
            Line((-82, 3), (-82, 0))
            Line((-82, 0), (-79, 0))
        make_face()
    revolve(axis=Axis((-92, 0, -12.5), (0, -1, 0)), mode=Mode.SUBTRACT)

    # F4_s59 → F4_t60 (revolve, cut)
    with BuildSketch(Plane.XY.offset(-12.5)):
        with BuildLine():
            ThreePointArc((13, 0), (10.8786796564, 0.8786796564), (10, 3))
            Line((10, 3), (10, 0))
            Line((10, 0), (13, 0))
        make_face()
    revolve(axis=Axis((0, 0, -12.5), (0, -1, 0)), mode=Mode.SUBTRACT)

    # F4_s61 → F4_t62 (revolve, cut)
    with BuildSketch(Plane.XY.offset(-12.5)):
        with BuildLine():
            ThreePointArc((105, 0), (102.8786796564, 0.8786796564), (102, 3))
            Line((102, 3), (102, 0))
            Line((102, 0), (105, 0))
        make_face()
    revolve(axis=Axis((92, 0, -12.5), (0, -1, 0)), mode=Mode.SUBTRACT)

    # F4_s63 → F4_t64 (revolve, cut)
    with BuildSketch(Plane.XY.offset(-12.5)):
        with BuildLine():
            ThreePointArc((197, 0), (194.8786796564, 0.8786796564), (194, 3))
            Line((194, 3), (194, 0))
            Line((194, 0), (197, 0))
        make_face()
    revolve(axis=Axis((184, 0, -12.5), (0, -1, 0)), mode=Mode.SUBTRACT)


solid = f1_8.part
